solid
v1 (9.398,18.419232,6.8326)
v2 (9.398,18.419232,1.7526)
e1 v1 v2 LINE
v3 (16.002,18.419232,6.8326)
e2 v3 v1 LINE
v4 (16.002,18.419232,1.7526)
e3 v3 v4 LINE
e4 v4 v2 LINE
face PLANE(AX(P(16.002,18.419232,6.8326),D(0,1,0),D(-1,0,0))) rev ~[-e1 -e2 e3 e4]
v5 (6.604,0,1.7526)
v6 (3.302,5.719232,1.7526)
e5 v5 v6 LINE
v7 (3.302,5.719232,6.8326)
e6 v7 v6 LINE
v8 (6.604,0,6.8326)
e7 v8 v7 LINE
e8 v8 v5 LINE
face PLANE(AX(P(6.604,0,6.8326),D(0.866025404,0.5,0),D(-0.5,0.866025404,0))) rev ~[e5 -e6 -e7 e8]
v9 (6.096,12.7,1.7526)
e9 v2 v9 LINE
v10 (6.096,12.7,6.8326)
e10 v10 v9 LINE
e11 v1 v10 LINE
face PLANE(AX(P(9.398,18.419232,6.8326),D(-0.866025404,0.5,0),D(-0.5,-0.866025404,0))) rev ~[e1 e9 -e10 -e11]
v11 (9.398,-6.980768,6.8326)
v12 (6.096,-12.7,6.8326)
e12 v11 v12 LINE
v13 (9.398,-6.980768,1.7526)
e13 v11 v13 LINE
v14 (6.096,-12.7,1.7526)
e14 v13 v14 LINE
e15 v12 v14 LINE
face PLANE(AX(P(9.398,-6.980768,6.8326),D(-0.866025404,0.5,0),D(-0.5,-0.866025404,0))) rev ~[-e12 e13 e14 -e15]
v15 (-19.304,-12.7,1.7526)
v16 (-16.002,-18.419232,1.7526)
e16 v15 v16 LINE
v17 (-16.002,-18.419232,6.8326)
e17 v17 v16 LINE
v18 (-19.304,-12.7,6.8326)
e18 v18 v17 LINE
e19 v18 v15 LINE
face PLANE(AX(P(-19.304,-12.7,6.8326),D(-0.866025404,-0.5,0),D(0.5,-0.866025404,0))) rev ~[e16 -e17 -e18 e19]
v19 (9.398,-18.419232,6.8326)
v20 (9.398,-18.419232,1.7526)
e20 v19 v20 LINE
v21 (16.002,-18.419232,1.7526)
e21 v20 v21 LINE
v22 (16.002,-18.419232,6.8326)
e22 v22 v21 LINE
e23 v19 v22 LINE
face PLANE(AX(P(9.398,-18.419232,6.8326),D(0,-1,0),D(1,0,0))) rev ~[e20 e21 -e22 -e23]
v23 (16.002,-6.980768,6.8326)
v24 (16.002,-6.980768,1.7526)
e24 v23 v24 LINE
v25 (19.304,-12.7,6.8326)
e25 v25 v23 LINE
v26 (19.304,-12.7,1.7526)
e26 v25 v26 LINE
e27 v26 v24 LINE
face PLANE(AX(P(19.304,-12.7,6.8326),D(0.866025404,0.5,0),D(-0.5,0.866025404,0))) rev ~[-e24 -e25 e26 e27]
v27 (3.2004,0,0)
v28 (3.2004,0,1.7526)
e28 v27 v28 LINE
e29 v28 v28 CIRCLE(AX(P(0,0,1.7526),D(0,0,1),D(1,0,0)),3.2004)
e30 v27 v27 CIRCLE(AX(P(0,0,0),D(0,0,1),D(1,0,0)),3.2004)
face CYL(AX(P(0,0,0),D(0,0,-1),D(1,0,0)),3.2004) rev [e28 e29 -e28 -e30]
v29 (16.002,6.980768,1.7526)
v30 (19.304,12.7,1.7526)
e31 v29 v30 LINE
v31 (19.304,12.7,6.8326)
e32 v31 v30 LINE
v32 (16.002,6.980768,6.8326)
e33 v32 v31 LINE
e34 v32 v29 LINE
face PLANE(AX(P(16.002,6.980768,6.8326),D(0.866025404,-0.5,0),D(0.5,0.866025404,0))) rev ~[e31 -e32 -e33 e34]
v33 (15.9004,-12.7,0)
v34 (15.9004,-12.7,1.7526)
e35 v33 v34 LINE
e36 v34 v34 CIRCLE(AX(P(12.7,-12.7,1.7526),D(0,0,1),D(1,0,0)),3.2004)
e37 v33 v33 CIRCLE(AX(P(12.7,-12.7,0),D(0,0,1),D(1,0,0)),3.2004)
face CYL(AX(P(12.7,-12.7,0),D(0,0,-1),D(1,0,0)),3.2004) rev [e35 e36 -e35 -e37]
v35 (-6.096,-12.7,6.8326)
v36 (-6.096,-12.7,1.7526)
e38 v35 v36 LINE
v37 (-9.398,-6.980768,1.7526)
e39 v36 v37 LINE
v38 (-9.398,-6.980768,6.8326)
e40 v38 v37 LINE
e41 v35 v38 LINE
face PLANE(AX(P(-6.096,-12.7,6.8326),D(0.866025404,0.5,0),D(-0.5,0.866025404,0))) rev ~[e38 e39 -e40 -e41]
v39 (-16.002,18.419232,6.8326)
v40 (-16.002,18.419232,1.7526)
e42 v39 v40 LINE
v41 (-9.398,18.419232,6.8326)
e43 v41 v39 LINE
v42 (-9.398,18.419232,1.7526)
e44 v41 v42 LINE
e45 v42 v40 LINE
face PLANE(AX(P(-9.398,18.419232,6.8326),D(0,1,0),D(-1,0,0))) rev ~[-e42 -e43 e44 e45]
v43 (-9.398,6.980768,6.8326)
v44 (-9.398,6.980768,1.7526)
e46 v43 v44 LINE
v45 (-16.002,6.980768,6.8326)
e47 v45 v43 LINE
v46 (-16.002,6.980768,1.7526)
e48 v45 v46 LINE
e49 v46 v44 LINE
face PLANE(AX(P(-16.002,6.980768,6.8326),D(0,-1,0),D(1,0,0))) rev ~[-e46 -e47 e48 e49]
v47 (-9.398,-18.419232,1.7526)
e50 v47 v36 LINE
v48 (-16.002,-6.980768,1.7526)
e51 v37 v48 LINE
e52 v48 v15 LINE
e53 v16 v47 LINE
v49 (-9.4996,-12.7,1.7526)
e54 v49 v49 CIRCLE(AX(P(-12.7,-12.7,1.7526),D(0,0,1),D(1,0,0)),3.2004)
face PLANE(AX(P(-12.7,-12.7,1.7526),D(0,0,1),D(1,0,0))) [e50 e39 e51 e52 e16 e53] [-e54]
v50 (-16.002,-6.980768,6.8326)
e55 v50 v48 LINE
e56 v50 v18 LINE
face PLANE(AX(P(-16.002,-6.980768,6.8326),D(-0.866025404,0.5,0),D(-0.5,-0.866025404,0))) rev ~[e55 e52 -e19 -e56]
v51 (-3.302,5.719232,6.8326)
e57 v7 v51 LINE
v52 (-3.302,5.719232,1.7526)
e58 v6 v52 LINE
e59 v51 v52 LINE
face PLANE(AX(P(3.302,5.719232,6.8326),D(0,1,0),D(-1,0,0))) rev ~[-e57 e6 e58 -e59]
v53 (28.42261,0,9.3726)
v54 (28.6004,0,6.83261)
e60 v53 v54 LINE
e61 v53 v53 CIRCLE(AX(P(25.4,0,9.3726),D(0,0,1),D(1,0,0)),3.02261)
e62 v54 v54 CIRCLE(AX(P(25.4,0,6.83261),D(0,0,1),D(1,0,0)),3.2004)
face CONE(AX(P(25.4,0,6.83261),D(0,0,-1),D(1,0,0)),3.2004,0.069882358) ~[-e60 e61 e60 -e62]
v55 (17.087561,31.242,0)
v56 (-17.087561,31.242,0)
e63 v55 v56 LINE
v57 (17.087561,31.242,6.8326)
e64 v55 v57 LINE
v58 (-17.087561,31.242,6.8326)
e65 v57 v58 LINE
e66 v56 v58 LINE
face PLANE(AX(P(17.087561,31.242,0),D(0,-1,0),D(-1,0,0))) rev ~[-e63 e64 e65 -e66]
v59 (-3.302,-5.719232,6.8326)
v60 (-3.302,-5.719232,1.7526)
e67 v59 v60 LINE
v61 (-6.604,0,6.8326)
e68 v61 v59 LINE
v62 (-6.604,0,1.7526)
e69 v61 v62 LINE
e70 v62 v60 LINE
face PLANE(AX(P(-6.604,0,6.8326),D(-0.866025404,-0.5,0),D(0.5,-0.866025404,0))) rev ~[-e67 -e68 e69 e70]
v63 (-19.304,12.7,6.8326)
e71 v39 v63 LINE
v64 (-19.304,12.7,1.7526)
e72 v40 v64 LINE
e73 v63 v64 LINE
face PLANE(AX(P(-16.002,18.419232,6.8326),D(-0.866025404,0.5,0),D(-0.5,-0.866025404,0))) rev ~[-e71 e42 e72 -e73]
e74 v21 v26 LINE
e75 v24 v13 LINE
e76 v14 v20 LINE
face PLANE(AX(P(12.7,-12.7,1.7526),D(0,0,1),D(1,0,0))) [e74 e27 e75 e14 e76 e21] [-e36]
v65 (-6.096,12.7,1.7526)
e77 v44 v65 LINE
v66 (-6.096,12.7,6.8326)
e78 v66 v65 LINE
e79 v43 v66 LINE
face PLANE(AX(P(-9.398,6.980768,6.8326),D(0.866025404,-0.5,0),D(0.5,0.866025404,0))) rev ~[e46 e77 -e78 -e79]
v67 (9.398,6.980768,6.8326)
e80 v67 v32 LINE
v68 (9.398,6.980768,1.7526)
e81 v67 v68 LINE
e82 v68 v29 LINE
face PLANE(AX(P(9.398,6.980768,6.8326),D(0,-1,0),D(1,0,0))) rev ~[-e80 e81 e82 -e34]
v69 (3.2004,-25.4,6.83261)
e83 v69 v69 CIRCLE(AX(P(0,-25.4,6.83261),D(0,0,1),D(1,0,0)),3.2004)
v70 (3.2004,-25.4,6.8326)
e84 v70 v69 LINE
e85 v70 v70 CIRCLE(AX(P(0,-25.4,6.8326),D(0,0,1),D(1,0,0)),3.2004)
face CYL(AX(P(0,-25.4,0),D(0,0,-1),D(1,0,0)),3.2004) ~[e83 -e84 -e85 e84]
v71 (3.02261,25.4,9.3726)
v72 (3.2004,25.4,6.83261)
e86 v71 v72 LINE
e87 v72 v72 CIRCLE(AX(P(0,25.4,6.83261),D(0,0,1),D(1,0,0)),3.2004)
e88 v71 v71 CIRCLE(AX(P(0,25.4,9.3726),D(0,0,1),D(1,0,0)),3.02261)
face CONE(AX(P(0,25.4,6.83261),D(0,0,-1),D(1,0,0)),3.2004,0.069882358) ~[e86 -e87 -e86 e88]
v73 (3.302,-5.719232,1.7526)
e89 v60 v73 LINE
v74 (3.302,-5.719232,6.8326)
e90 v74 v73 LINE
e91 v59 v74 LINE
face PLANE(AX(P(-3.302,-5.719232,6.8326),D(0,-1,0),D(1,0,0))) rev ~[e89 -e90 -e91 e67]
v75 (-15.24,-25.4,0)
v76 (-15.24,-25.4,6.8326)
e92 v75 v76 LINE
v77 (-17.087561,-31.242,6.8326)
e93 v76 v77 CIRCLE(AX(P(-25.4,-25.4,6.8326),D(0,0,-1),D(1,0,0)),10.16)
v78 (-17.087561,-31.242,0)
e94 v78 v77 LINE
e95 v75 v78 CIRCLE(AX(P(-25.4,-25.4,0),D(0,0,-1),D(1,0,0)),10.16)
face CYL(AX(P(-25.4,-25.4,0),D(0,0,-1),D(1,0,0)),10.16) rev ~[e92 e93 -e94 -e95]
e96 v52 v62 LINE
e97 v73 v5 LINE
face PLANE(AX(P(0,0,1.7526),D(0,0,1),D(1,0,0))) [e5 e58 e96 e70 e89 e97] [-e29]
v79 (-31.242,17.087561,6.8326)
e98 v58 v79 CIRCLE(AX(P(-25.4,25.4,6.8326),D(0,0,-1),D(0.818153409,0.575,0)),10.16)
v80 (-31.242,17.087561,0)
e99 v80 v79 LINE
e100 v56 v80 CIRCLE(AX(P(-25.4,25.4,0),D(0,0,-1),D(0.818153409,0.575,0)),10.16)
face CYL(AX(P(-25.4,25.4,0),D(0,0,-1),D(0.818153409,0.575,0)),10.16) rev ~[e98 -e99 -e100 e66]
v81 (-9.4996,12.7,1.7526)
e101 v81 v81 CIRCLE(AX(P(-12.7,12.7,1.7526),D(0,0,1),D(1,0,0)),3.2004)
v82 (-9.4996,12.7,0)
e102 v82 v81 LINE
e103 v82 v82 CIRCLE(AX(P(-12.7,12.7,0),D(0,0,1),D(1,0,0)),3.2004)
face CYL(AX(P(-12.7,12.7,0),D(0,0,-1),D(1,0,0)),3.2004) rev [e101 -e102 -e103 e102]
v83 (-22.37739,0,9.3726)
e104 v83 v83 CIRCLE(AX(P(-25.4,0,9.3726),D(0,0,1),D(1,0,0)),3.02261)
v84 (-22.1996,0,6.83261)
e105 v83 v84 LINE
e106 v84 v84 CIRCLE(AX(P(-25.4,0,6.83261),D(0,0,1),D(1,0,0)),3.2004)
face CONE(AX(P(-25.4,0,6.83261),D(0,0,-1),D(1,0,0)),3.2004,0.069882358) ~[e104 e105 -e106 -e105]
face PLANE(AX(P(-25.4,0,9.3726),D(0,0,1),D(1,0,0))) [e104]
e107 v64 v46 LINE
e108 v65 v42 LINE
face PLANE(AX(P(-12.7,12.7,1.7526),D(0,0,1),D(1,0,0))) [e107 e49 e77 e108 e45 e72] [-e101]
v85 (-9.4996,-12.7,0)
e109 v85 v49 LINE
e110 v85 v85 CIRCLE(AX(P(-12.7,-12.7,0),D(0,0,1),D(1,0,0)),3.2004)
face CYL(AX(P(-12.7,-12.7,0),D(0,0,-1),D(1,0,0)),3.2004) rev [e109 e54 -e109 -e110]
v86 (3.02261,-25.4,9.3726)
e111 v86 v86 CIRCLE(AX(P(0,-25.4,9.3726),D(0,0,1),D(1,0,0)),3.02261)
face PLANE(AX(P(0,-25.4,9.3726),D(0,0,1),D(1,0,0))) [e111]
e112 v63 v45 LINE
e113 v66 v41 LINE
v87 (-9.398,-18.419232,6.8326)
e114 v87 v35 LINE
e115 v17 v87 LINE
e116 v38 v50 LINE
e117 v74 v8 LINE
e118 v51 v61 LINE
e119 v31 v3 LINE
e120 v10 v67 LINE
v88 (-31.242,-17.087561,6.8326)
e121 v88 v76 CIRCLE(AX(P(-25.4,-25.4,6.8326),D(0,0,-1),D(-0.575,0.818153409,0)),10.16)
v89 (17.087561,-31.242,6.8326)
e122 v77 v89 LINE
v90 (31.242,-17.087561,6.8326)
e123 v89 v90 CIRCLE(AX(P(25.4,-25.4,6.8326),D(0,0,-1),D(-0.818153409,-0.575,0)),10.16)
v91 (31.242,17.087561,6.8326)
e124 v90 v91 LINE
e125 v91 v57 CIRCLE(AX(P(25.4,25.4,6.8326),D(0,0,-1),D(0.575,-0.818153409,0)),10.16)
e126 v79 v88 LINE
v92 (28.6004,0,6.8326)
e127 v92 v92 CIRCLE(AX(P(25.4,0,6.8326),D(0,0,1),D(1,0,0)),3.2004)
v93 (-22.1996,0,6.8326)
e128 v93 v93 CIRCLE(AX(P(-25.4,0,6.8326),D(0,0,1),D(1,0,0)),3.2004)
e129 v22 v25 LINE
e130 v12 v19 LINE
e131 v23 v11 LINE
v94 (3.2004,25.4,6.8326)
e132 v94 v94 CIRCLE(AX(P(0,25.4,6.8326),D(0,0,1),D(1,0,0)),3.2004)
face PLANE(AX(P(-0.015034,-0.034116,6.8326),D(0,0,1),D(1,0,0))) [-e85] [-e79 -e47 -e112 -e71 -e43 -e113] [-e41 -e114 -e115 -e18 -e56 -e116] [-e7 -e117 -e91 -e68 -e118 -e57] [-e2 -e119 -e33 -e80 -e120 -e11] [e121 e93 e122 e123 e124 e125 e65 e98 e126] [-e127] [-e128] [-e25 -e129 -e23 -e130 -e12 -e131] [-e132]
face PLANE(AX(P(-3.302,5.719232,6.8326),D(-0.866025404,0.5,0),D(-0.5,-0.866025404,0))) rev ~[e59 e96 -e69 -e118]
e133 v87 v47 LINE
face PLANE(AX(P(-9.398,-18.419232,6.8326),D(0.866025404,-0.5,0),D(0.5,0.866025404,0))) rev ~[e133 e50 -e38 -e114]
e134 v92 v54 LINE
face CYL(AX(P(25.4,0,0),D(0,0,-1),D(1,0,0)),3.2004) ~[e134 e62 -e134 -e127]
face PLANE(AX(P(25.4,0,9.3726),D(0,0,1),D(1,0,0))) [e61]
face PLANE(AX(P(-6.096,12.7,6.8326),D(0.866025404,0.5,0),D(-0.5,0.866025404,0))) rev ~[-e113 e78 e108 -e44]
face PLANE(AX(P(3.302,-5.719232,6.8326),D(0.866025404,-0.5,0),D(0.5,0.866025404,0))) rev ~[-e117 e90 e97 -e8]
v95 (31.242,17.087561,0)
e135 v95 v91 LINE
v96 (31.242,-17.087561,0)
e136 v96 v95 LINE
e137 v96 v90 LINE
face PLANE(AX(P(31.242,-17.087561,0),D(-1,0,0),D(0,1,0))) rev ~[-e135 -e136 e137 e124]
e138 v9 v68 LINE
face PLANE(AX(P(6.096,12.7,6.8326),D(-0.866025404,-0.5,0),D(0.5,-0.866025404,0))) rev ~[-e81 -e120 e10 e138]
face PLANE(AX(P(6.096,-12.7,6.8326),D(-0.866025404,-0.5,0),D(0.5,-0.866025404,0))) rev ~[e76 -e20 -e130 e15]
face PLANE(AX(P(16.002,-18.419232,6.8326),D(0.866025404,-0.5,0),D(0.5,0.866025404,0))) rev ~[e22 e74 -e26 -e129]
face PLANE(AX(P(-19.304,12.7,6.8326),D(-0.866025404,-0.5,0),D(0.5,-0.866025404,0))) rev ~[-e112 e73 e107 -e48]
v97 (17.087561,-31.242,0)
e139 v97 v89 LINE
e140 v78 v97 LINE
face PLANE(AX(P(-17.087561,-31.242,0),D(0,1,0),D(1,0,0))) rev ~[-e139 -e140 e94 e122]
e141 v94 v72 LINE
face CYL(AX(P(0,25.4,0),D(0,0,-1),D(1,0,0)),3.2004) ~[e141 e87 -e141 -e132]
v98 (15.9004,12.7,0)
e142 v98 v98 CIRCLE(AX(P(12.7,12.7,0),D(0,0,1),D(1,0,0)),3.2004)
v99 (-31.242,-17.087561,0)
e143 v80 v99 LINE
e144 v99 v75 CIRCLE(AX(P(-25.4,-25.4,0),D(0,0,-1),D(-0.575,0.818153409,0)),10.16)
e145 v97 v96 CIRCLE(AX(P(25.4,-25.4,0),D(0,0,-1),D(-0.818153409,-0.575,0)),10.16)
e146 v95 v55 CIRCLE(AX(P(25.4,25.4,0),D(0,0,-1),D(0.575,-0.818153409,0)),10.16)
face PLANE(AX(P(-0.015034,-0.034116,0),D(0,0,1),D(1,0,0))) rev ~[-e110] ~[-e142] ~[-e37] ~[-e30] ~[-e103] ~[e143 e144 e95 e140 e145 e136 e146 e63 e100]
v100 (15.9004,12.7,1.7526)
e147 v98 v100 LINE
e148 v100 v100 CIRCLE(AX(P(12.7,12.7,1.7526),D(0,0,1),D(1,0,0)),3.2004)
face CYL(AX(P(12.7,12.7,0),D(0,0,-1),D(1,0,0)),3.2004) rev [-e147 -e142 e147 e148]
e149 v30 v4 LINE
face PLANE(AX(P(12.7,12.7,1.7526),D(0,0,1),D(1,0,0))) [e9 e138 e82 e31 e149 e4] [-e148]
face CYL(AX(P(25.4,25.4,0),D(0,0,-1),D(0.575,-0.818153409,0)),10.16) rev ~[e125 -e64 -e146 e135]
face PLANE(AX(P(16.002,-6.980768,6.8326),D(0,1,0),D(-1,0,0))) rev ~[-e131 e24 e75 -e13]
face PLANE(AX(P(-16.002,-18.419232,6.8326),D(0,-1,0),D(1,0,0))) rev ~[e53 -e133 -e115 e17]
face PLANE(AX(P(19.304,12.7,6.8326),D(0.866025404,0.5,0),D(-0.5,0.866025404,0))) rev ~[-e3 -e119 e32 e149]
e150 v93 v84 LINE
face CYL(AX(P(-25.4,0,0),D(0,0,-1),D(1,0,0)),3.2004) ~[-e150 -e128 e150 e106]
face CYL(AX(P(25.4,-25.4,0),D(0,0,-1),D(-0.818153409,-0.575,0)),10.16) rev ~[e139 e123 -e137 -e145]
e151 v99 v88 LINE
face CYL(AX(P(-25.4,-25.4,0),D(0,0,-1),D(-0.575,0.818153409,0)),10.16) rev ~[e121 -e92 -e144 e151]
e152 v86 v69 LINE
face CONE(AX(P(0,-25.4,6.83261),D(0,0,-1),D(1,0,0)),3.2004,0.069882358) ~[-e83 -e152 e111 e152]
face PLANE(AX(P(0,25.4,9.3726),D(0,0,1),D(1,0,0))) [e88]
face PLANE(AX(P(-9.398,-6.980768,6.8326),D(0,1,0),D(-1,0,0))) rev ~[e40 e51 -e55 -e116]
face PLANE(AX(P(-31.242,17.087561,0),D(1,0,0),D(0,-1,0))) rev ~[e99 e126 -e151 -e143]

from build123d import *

# Parameters (mm, degrees)
F0_R       = 3.2004
F0_R_2     = 6.858
F1_DEPTH   = 6.8326
F2_DEPTH   = 9.3726
F3_R       = 3.2004
F4_DEPTH   = 5.08
F5_SIZE2   = 2.53999
F5_SIZE    = 0.17779
F5_2_SIZE2 = 2.53999
F5_2_SIZE  = 0.17779
F5_3_SIZE2 = 2.53999
F5_3_SIZE  = 0.17779
F5_4_SIZE2 = 2.53999
F5_4_SIZE  = 0.17779


# Not quite as in the source:
# - a fillet or chamfer is up to 0.001 mm smaller than in the source, because OpenCascade refuses the exact size


with BuildPart() as f1:
    # F0 (on Top) → F1 (new body)
    with BuildSketch(Plane.XY):
        with BuildLine():
            ThreePointArc((-31.242, -17.0875613686), (-20.7164714157, -16.3838944106), (-15.24, -25.4))
            ThreePointArc((-15.24, -25.4), (-15.712895776, -28.4635945803), (-17.0875613686, -31.242))
            Line((-17.0875613686, -31.242), (17.0875613686, -31.242))
            ThreePointArc((17.0875613686, -31.242), (18.2157951031, -18.2157951031), (31.242, -17.0875613686))
            Line((31.242, -17.0875613686), (31.242, 17.0875613686))
            ThreePointArc((31.242, 17.0875613686), (18.2157951031, 18.2157951031), (17.0875613686, 31.242))
            Line((17.0875613686, 31.242), (-17.0875613686, 31.242))
            ThreePointArc((-17.0875613686, 31.242), (-18.2157951031, 18.2157951031), (-31.242, 17.0875613686))
            Line((-31.242, 17.0875613686), (-31.242, -17.0875613686))
        make_face()
        with Locations((0, -25.4)):
            Circle(F0_R, mode=Mode.SUBTRACT)
        with Locations((-25.4, 0)):
            Circle(F0_R, mode=Mode.SUBTRACT)
        with Locations((-12.7, -12.7)):
            Circle(F0_R, mode=Mode.SUBTRACT)
        Circle(F0_R_2, mode=Mode.SUBTRACT)
        with Locations((12.7, -12.7)):
            Circle(F0_R, mode=Mode.SUBTRACT)
        with Locations((25.4, 0)):
            Circle(F0_R, mode=Mode.SUBTRACT)
        with Locations((-12.7, 12.7)):
            Circle(F0_R, mode=Mode.SUBTRACT)
        with Locations((0, 25.4)):
            Circle(F0_R, mode=Mode.SUBTRACT)
        with Locations((12.7, 12.7)):
            Circle(F0_R, mode=Mode.SUBTRACT)
        Circle(F0_R_2)
        Circle(F0_R, mode=Mode.SUBTRACT)
    extrude(amount=F1_DEPTH)

    # F0 (on Top) → F2 (join)
    with BuildSketch(Plane.XY):
        with Locations((-25.4, 0)):
            Circle(F0_R)
        with Locations((0, -25.4)):
            Circle(F0_R)
        with Locations((25.4, 0)):
            Circle(F0_R)
        with Locations((0, 25.4)):
            Circle(F0_R)
    extrude(amount=F2_DEPTH)

    # F3 (on face) → F4 (cut)
    with BuildSketch(Plane.XY.offset(6.8326)):
        Polygon((-9.398, 6.9807682334), (-6.096, 12.7), (-9.398, 18.4192317666), (-16.002, 18.4192317666), (-19.304, 12.7), (-16.002, 6.9807682334), align=None)
        with Locations((-12.7, 12.7)):
            Circle(F3_R, mode=Mode.SUBTRACT)
        Polygon((9.398, 18.4192317666), (6.096, 12.7), (9.398, 6.9807682334), (16.002, 6.9807682334), (19.304, 12.7), (16.002, 18.4192317666), align=None)
        with Locations((12.7, 12.7)):
            Circle(F3_R, mode=Mode.SUBTRACT)
        Polygon((-9.398, -18.4192317666), (-6.096, -12.7), (-9.398, -6.9807682334), (-16.002, -6.9807682334), (-19.304, -12.7), (-16.002, -18.4192317666), align=None)
        with Locations((-12.7, -12.7)):
            Circle(F3_R, mode=Mode.SUBTRACT)
        Polygon((9.398, -6.9807682334), (6.096, -12.7), (9.398, -18.4192317666), (16.002, -18.4192317666), (19.304, -12.7), (16.002, -6.9807682334), align=None)
        with Locations((12.7, -12.7)):
            Circle(F3_R, mode=Mode.SUBTRACT)
        Polygon((3.302, -5.7192317666), (6.604, 0), (3.302, 5.7192317666), (-3.302, 5.7192317666), (-6.604, 0), (-3.302, -5.7192317666), align=None)
        Circle(F3_R, mode=Mode.SUBTRACT)
    extrude(amount=-F4_DEPTH, mode=Mode.SUBTRACT)

    # F5 (size 0.1778 and 2.54 in the source; OpenCascade refuses exactly that, so slightly less here)
    f5_edges = [f1.edges().sort_by_distance(p)[0] for p in [
        (-28.6004, 0, 9.3726),
    ]]
    f5_side = f1.faces().sort_by_distance((-25.4, 0, 9.3726))[0]
    chamfer(f5_edges, length=F5_SIZE, length2=F5_SIZE2, reference=f5_side)

    # F5#2 (size 0.1778 and 2.54 in the source; OpenCascade refuses exactly that, so slightly less here)
    f5_2_edges = [f1.edges().sort_by_distance(p)[0] for p in [
        (-3.2004, 25.4, 9.3726),
    ]]
    f5_2_side = f1.faces().sort_by_distance((0, 25.4, 9.3726))[0]
    chamfer(f5_2_edges, length=F5_2_SIZE, length2=F5_2_SIZE2, reference=f5_2_side)

    # F5#3 (size 0.1778 and 2.54 in the source; OpenCascade refuses exactly that, so slightly less here)
    f5_3_edges = [f1.edges().sort_by_distance(p)[0] for p in [
        (22.1996, 0, 9.3726),
    ]]
    f5_3_side = f1.faces().sort_by_distance((25.4, 0, 9.3726))[0]
    chamfer(f5_3_edges, length=F5_3_SIZE, length2=F5_3_SIZE2, reference=f5_3_side)

    # F5#4 (size 0.1778 and 2.54 in the source; OpenCascade refuses exactly that, so slightly less here)
    f5_4_edges = [f1.edges().sort_by_distance(p)[0] for p in [
        (-3.2004, -25.4, 9.3726),
    ]]
    f5_4_side = f1.faces().sort_by_distance((0, -25.4, 9.3726))[0]
    chamfer(f5_4_edges, length=F5_4_SIZE, length2=F5_4_SIZE2, reference=f5_4_side)


solid = f1.part
